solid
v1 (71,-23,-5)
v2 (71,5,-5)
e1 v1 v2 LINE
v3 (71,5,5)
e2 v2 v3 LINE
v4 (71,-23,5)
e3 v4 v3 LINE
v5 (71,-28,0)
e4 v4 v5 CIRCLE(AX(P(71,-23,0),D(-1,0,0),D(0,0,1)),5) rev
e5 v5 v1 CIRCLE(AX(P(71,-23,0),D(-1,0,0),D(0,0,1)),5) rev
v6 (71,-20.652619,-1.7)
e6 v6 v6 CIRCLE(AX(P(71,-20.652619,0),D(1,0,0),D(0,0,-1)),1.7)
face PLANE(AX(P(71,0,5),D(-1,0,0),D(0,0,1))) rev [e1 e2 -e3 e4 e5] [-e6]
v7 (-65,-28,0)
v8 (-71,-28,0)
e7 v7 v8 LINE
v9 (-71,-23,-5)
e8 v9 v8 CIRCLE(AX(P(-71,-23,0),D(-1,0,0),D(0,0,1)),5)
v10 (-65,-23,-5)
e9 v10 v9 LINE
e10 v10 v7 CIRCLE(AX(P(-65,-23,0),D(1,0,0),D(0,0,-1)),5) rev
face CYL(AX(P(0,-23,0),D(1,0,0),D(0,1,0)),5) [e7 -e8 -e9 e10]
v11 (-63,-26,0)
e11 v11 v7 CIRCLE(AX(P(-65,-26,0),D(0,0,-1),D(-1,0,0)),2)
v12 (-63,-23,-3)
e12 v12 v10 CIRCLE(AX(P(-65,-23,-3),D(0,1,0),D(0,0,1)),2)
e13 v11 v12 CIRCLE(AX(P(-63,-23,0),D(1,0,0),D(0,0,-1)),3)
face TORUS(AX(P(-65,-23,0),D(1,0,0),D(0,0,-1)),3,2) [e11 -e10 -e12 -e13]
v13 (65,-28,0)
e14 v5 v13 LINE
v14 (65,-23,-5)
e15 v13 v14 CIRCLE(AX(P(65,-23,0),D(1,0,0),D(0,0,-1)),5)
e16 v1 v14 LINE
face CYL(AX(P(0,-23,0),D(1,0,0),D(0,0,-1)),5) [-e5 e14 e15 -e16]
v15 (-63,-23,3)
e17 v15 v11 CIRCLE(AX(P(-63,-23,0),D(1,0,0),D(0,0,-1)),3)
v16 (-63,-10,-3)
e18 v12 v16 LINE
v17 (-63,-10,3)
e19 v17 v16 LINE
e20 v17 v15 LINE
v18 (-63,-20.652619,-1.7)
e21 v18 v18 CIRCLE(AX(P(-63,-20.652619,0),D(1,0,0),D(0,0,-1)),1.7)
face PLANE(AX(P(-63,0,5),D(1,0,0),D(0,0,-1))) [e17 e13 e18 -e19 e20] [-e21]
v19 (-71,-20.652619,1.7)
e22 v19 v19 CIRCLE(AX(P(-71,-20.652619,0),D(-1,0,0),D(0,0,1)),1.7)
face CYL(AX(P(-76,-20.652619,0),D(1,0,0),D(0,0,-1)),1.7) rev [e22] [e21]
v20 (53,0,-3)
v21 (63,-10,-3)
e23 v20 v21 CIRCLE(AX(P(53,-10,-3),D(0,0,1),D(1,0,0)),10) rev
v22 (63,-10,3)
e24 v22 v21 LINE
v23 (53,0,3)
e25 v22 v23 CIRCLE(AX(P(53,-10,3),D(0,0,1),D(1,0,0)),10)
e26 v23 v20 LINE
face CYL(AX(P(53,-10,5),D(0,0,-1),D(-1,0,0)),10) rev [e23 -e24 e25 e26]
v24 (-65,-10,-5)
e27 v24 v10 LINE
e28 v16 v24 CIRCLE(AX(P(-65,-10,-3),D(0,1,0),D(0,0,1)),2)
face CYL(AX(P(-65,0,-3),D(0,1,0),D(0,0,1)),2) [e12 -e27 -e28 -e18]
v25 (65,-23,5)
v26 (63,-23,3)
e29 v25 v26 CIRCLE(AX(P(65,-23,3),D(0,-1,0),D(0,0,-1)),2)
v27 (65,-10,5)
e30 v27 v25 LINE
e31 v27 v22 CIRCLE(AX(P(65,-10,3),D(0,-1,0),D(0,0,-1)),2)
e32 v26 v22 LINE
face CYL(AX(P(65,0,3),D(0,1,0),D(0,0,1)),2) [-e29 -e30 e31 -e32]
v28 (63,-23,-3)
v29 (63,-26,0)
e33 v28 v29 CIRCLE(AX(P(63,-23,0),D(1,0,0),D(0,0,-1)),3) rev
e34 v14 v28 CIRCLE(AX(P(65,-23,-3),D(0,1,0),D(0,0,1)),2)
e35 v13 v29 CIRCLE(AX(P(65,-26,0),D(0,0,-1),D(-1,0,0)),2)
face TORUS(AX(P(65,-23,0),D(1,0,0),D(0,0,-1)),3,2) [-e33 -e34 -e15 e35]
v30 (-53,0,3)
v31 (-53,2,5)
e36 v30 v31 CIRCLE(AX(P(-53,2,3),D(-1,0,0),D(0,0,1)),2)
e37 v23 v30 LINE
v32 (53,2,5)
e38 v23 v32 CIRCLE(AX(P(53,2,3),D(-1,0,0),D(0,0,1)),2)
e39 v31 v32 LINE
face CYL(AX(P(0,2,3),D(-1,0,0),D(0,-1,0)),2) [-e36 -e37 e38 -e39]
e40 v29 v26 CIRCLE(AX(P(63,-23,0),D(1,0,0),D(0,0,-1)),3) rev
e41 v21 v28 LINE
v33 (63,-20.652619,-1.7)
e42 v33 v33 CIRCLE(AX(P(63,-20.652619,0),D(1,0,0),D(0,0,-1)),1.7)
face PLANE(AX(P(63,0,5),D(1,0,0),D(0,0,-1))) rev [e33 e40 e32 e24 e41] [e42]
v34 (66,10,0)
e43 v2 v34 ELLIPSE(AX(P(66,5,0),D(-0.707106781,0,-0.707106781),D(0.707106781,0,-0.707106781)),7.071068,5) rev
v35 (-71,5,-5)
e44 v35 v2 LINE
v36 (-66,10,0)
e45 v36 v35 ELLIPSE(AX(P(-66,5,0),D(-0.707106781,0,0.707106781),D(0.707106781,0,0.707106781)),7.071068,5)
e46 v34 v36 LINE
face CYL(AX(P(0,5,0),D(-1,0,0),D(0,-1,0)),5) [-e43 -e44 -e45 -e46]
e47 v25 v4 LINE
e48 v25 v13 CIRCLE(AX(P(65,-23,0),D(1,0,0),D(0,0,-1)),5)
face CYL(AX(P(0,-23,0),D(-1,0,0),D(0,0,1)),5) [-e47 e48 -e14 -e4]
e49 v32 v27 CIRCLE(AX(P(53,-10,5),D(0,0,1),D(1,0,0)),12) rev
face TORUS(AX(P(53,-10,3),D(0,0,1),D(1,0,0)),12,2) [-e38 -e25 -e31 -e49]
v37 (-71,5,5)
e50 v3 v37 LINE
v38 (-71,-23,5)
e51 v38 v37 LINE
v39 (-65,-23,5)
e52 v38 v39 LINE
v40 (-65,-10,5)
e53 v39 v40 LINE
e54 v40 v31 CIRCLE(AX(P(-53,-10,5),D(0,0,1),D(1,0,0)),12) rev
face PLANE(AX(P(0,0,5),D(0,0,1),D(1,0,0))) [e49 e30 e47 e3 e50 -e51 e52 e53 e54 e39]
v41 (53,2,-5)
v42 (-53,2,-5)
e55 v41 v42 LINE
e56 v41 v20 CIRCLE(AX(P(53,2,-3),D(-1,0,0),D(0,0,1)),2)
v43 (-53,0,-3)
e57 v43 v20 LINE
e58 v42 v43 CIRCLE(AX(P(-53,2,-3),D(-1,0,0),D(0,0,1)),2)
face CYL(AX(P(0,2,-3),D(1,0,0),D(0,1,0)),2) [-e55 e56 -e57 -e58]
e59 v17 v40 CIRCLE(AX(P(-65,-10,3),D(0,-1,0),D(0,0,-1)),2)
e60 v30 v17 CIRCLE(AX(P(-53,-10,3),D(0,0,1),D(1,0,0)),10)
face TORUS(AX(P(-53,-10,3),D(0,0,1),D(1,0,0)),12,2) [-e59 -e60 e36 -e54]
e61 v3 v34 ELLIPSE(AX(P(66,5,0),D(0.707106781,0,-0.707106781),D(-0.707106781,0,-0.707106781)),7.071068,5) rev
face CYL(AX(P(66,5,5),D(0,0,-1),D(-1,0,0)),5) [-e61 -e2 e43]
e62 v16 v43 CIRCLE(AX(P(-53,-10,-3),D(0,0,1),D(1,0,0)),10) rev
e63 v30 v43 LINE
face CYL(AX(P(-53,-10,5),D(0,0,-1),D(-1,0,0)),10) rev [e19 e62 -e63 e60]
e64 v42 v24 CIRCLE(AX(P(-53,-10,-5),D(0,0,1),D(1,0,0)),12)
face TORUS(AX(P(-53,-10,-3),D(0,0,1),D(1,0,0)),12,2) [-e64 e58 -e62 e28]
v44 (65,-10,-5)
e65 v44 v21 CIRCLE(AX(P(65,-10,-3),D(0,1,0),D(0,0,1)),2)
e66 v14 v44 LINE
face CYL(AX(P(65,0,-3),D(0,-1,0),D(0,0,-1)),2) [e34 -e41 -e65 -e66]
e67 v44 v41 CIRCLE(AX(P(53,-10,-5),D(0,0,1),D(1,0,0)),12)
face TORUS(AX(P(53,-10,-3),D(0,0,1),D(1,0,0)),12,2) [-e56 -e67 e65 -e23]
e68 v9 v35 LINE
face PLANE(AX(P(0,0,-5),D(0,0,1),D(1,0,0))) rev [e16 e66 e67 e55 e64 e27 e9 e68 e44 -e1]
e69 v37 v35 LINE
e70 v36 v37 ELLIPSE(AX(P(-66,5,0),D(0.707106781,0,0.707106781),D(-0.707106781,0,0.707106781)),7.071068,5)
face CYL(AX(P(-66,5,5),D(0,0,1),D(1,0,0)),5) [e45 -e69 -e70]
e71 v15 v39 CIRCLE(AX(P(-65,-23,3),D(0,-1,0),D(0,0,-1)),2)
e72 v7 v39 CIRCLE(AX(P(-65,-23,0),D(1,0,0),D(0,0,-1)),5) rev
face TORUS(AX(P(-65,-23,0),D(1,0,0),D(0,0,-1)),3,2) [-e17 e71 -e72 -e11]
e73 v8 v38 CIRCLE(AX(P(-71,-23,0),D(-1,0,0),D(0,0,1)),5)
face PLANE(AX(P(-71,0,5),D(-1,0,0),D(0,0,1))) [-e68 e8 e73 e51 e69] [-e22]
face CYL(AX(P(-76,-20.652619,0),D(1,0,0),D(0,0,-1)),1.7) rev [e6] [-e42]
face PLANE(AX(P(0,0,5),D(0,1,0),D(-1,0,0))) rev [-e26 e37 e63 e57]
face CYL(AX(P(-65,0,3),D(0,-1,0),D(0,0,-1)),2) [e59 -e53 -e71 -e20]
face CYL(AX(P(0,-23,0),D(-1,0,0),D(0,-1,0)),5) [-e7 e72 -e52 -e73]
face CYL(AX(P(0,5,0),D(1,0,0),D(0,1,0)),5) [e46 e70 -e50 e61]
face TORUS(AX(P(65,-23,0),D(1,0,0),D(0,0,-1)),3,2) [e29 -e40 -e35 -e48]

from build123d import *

# Parameters (mm, degrees)
BOSS_EXTRUDE1_DEPTH = 5
FILLET1_R           = 5
FILLET2_R           = 5
FILLET3_R           = 2
SKETCH2_R           = 1.7
CUT_EXTRUDE1_DEPTH  = 147


with BuildPart() as part:
    # Sketch1 → Boss-Extrude1 (new, symmetric)
    with BuildSketch(Plane.XY):
        with BuildLine():
            ThreePointArc((-63, -10), (-60.071067812, -2.928932188), (-53, 0))
            Line((-53, 0), (0, 0))
            Line((0, 0), (0, 10))
            Line((0, 10), (-71, 10))
            Line((-71, 10), (-71, 0))
            Line((-71, 0), (-71, -28))
            Line((-71, -28), (-63, -28))
            Line((-63, -28), (-63, -10))
        make_face()
        with BuildLine():
            Line((0, 10), (0, 0))
            Line((0, 0), (53, 0))
            ThreePointArc((53, 0), (60.071067812, -2.928932188), (63, -10))
            Line((63, -10), (63, -28))
            Line((63, -28), (71, -28))
            Line((71, -28), (71, 0))
            Line((71, 0), (71, 10))
            Line((71, 10), (0, 10))
        make_face()
    extrude(amount=BOSS_EXTRUDE1_DEPTH, both=True)

    # Fillet1
    fillet1_edges = [part.edges().sort_by_distance(p)[0] for p in [
        (-67, -28, -5),
        (-67, -28, 5),
        (67, -28, -5),
        (67, -28, 5),
    ]]
    fillet(fillet1_edges, radius=FILLET1_R - 0.0001)  # a hair under: the kernel refuses the full size

    # Fillet2
    fillet2_edges = [part.edges().sort_by_distance(p)[0] for p in [
        (0, 10, -5),
        (-71, 10, 0),
        (71, 10, 0),
        (0, 10, 5),
    ]]
    fillet(fillet2_edges, radius=FILLET2_R - 0.0001)  # a hair under: the kernel refuses the full size

    # Fillet3
    fillet3_edges = [part.edges().sort_by_distance(p)[0] for p in [
        (0, 0, 5),
        (-63, -16.50005, -5),
        (63, -16.50005, -5),
        (60.071067812, -2.928932188, -5),
        (60.071067812, -2.928932188, 5),
        (0, 0, -5),
        (-60.071067812, -2.928932188, -5),
        (63, -16.50005, 5),
        (-63, -26.535563195, 3.535563195),
        (-63, -26.535563195, -3.535563195),
        (63, -26.535563195, 3.535563195),
        (63, -26.535563195, -3.535563195),
        (-60.071067812, -2.928932188, 5),
        (-63, -16.50005, 5),
    ]]
    fillet(fillet3_edges, radius=FILLET3_R)

    # Sketch2 → Cut-Extrude1 (cut)
    with BuildSketch(Plane(origin=(71, 0, 0), x_dir=(0, 0, -1), z_dir=(1, 0, 0))):
        with Locations((0, -20.652619003)):
            Circle(SKETCH2_R)
    extrude(amount=-CUT_EXTRUDE1_DEPTH, mode=Mode.SUBTRACT)


solid = part.part
